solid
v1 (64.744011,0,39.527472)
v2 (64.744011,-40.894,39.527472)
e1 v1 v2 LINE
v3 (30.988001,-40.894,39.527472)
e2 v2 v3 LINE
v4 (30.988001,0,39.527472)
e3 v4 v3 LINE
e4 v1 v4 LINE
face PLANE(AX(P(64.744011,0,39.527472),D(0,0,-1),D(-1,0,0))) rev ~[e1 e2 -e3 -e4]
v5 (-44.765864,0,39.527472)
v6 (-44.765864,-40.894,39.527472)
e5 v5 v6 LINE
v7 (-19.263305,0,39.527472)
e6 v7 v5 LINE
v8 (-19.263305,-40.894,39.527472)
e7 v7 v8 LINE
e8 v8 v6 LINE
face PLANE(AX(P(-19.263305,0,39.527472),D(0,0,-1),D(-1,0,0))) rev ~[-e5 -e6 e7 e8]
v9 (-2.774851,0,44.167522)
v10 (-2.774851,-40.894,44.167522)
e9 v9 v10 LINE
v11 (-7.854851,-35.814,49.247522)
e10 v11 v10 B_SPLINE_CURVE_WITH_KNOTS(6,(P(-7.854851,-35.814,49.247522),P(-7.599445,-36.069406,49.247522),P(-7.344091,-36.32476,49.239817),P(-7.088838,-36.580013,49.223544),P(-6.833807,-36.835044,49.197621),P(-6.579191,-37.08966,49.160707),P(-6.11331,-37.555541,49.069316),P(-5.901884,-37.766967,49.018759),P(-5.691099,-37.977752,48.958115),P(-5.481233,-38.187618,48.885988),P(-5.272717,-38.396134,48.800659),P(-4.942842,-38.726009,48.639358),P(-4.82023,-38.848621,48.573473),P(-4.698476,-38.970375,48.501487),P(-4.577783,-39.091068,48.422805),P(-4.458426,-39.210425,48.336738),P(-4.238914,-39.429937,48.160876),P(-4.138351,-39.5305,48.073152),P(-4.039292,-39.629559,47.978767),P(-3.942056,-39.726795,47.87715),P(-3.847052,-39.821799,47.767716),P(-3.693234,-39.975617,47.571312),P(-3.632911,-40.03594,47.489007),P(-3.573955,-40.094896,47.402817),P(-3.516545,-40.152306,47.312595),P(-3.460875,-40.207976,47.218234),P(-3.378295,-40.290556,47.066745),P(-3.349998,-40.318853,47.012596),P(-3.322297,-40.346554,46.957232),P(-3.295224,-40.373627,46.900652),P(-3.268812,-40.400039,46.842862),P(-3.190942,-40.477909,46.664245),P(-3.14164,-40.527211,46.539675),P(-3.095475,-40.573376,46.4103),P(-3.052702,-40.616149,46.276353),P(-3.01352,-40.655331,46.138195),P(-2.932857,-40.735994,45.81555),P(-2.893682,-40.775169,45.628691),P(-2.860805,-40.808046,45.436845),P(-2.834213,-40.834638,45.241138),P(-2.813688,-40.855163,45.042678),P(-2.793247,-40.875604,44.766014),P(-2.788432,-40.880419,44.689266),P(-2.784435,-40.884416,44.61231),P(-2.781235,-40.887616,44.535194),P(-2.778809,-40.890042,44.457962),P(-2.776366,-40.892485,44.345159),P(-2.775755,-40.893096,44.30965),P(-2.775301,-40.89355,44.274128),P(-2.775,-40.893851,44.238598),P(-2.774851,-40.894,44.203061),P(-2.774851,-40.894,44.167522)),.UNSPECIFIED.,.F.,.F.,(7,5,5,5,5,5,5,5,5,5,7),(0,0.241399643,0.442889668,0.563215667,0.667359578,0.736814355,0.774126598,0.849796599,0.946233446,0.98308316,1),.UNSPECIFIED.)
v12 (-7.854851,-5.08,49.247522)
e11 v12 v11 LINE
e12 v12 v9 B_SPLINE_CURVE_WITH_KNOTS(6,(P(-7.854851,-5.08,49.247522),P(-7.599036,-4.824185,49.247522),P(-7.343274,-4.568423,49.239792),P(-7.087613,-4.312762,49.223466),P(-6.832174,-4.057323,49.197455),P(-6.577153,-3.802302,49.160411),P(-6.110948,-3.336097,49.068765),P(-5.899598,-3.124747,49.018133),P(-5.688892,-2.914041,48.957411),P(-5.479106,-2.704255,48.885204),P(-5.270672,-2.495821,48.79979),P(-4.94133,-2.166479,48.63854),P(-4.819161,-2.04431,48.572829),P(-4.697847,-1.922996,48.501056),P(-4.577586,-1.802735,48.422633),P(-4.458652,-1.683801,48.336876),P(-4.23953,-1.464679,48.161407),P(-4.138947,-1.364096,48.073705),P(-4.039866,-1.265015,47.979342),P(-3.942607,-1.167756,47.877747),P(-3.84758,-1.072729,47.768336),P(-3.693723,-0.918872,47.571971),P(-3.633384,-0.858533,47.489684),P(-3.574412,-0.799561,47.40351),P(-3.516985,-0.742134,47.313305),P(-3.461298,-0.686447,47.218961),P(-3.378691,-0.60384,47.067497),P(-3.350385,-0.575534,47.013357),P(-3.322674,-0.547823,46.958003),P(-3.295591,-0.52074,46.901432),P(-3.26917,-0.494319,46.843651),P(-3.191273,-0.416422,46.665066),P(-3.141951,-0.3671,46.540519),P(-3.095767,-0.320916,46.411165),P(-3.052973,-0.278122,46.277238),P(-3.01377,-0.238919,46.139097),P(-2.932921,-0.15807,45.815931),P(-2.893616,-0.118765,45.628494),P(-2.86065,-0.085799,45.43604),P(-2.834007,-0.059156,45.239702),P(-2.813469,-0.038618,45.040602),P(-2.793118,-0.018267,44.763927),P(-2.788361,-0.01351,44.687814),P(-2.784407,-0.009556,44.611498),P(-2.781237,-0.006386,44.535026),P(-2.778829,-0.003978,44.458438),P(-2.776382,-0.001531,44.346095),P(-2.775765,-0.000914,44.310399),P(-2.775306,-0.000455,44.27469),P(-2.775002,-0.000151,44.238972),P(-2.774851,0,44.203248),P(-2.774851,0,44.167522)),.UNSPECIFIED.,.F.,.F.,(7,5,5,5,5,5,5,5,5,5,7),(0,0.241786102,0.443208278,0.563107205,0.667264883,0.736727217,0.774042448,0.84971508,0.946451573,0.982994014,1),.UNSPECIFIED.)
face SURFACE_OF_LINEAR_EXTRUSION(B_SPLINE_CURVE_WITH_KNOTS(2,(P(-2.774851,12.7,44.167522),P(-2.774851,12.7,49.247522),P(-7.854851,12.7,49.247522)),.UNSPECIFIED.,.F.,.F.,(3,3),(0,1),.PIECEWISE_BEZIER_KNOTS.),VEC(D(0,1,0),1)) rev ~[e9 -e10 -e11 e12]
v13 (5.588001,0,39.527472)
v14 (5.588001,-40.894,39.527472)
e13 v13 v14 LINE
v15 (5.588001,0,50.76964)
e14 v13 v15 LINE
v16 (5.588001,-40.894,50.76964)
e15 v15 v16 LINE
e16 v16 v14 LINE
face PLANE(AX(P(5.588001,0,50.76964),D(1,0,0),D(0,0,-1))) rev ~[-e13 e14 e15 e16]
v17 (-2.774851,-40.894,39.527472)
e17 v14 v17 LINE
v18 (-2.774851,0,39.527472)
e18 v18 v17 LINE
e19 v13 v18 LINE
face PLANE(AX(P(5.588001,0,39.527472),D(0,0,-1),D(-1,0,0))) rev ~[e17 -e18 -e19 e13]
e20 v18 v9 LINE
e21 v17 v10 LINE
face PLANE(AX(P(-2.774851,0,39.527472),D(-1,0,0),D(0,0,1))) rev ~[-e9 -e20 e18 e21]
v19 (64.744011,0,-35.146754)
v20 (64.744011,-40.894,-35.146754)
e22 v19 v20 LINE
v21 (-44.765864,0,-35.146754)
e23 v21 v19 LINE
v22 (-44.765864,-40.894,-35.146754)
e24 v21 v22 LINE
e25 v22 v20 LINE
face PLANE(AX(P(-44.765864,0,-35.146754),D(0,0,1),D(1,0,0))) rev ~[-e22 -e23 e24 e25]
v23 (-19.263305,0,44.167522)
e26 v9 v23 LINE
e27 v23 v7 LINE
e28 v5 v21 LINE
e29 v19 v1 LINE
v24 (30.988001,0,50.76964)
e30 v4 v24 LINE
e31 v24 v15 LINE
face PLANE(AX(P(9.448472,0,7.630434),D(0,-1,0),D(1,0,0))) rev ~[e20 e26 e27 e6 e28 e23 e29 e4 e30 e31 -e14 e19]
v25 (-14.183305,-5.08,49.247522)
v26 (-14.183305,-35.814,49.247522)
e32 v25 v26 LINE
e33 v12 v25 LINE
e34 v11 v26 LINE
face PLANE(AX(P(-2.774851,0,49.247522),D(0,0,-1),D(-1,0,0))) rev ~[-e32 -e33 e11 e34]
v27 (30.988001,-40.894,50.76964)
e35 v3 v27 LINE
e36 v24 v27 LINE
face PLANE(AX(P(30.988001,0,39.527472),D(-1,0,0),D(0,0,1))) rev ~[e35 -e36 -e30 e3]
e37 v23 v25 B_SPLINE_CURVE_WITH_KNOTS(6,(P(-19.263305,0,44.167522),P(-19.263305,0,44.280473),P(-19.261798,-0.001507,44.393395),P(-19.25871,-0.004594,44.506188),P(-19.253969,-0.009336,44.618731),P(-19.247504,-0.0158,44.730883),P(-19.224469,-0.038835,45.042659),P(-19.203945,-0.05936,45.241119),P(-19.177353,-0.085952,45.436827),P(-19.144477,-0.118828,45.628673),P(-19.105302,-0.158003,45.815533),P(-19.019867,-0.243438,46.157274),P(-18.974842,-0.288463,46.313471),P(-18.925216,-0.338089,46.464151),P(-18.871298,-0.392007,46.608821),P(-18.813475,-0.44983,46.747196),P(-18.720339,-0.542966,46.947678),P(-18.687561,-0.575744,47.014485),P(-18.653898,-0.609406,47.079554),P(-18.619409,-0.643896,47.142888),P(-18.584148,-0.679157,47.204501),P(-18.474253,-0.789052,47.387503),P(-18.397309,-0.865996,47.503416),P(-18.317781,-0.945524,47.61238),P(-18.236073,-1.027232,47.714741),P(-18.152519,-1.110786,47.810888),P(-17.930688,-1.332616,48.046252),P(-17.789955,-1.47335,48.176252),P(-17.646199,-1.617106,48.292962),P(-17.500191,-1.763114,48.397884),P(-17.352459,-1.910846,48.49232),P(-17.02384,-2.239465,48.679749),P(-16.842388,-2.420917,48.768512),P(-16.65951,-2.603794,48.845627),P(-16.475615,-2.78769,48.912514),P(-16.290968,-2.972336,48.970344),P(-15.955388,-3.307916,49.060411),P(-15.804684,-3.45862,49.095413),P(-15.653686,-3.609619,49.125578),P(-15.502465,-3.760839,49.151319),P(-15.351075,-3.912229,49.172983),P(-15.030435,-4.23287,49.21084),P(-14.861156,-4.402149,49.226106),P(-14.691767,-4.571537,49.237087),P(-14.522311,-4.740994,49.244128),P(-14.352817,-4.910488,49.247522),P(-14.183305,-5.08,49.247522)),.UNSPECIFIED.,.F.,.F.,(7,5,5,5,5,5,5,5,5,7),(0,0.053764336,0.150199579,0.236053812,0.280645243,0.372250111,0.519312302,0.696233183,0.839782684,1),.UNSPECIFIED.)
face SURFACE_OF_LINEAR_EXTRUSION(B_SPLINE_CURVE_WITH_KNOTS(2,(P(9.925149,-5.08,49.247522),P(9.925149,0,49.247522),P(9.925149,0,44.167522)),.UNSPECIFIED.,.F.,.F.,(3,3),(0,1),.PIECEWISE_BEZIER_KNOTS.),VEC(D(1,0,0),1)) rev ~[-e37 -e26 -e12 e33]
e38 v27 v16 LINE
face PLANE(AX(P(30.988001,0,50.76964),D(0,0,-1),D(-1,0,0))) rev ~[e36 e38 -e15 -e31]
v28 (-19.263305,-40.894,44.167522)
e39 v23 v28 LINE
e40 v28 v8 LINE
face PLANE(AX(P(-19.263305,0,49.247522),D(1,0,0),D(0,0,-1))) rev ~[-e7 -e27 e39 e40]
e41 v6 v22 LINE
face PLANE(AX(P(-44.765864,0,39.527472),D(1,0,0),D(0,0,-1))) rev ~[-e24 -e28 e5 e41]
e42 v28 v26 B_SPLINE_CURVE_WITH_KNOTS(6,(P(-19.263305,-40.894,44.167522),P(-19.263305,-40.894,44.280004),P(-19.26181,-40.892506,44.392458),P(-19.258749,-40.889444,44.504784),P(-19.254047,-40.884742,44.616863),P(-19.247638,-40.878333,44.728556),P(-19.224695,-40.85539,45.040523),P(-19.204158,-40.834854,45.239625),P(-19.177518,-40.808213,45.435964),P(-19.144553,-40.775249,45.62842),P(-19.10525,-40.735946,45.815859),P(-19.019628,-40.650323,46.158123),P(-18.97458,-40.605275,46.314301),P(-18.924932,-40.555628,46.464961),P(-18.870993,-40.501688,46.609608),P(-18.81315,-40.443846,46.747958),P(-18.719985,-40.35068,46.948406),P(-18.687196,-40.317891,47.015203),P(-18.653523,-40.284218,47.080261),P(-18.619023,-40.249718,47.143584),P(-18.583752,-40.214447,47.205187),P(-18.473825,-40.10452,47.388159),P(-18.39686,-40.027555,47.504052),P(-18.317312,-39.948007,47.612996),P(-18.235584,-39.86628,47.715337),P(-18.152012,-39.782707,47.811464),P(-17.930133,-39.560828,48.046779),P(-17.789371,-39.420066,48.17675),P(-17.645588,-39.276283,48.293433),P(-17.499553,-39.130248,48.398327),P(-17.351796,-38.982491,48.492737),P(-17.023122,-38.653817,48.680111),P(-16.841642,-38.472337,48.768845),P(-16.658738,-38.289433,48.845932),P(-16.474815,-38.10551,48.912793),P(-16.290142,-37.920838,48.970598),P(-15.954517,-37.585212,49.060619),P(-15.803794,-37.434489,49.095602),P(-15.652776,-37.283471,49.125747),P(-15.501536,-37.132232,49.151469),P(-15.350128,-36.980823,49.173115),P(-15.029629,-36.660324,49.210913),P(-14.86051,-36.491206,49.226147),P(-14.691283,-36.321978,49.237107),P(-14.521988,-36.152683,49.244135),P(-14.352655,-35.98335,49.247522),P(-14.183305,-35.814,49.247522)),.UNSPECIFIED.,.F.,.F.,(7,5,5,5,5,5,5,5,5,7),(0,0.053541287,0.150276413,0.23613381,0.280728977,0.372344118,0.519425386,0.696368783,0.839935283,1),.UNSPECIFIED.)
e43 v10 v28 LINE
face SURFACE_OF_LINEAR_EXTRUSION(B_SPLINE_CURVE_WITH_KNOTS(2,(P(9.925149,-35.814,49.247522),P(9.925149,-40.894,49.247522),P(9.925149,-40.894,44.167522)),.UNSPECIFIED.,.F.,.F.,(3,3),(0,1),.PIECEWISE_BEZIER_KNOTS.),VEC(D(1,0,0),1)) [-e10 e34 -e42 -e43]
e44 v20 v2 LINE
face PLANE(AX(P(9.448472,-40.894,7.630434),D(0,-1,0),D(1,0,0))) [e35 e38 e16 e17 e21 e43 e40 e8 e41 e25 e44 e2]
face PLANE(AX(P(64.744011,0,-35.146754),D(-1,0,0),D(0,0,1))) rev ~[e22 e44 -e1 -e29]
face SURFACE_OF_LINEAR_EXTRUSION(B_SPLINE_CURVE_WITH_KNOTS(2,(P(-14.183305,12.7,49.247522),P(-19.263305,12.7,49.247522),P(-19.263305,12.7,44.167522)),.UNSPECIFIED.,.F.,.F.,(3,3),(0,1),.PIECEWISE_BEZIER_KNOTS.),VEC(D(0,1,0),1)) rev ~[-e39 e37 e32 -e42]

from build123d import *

# Parameters (mm, degrees)
F1_DEPTH     = 40.894
F2_T1_DEPTH  = 66.294
F2_T6_DEPTH  = 41.888453839
F2_T11_DEPTH = 41.888453839


# Not quite as in the source:
# - a fillet or chamfer that OpenCascade refuses, or shapes differently, is made with other operations: its cross-section is extruded or revolved along the edge and cut away or added


with BuildPart() as f1:
    # F0 (on Front) → F1 (new body)
    with BuildSketch(Plane.XZ):
        Polygon((-44.7658635676, 39.5274721086), (-44.7658635676, -35.146754235), (64.7440105677, -35.146754235), (64.7440105677, 39.5274721086), (30.9880006403, 39.5274721086), (30.9880006403, 50.7696404397), (5.5880006403, 50.7696404397), (5.5880006403, 39.5274721086), (-2.774850931, 39.5274721086), (-2.774850931, 49.2475219071), (-19.26330477, 49.2475219071), (-19.26330477, 39.5274721086), align=None)
    extrude(amount=F1_DEPTH)

    # F2: fillet of radius 5.08 on 4 edges, made by hand

    # F2_s2 → F2_t1 (cut)
    with BuildSketch(Plane.XZ.offset(-12.7)):
        with BuildLine():
            add(Edge.make_bspline(
                [(-2.774850931, 44.1675219071), (-2.774850931, 49.2475219071), (-7.854850931, 49.2475219071)],
                knots=[0, 0, 0, 1, 1, 1], degree=2, weights=[1, 1, 1]))
            Line((-7.854850931, 49.2475219071), (-2.774850931, 49.2475219071))
            Line((-2.774850931, 49.2475219071), (-2.774850931, 44.1675219071))
        make_face()
        with BuildLine():
            add(Edge.make_bspline(
                [(-14.18330477, 49.2475219071), (-19.26330477, 49.2475219071), (-19.26330477, 44.1675219071)],
                knots=[0, 0, 0, 1, 1, 1], degree=2, weights=[1, 1, 1]))
            Line((-19.26330477, 44.1675219071), (-19.26330477, 49.2475219071))
            Line((-19.26330477, 49.2475219071), (-14.18330477, 49.2475219071))
        make_face()
    extrude(amount=F2_T1_DEPTH, mode=Mode.SUBTRACT)


with BuildPart() as f2_tool4:
    # F2_s5 → F2_t6 (new body)
    with BuildSketch(Plane.YZ.offset(9.925149069)):
        with BuildLine():
            add(Edge.make_bspline(
                [(-5.08, 49.2475219071), (0, 49.2475219071), (0, 44.1675219071)],
                knots=[0, 0, 0, 1, 1, 1], degree=2, weights=[1, 1, 1]))
            Line((0, 44.1675219071), (0, 49.2475219071))
            Line((0, 49.2475219071), (-5.08, 49.2475219071))
        make_face()
    extrude(amount=-F2_T6_DEPTH)

    split(bisect_by=Plane.YZ.offset(5.5880006403), keep=Keep.BOTTOM)


with BuildPart() as f1_1:
    add(f1.part)

    # F2_t3: cut F2_tool4
    add(f2_tool4.part, mode=Mode.SUBTRACT)


with BuildPart() as f2_tool9:
    # F2_s10 → F2_t11 (new body)
    with BuildSketch(Plane.YZ.offset(9.925149069)):
        with BuildLine():
            add(Edge.make_bspline(
                [(-35.814, 49.2475219071), (-40.894, 49.2475219071), (-40.894, 44.1675219071)],
                knots=[0, 0, 0, 1, 1, 1], degree=2, weights=[1, 1, 1]))
            Line((-40.894, 44.1675219071), (-40.894, 49.2475219071))
            Line((-40.894, 49.2475219071), (-35.814, 49.2475219071))
        make_face()
    extrude(amount=-F2_T11_DEPTH)

    split(bisect_by=Plane.YZ.offset(5.5880006403), keep=Keep.BOTTOM)


with BuildPart() as f1_2:
    add(f1_1.part)

    # F2_t8: cut F2_tool9
    add(f2_tool9.part, mode=Mode.SUBTRACT)


solid = f1_2.part
